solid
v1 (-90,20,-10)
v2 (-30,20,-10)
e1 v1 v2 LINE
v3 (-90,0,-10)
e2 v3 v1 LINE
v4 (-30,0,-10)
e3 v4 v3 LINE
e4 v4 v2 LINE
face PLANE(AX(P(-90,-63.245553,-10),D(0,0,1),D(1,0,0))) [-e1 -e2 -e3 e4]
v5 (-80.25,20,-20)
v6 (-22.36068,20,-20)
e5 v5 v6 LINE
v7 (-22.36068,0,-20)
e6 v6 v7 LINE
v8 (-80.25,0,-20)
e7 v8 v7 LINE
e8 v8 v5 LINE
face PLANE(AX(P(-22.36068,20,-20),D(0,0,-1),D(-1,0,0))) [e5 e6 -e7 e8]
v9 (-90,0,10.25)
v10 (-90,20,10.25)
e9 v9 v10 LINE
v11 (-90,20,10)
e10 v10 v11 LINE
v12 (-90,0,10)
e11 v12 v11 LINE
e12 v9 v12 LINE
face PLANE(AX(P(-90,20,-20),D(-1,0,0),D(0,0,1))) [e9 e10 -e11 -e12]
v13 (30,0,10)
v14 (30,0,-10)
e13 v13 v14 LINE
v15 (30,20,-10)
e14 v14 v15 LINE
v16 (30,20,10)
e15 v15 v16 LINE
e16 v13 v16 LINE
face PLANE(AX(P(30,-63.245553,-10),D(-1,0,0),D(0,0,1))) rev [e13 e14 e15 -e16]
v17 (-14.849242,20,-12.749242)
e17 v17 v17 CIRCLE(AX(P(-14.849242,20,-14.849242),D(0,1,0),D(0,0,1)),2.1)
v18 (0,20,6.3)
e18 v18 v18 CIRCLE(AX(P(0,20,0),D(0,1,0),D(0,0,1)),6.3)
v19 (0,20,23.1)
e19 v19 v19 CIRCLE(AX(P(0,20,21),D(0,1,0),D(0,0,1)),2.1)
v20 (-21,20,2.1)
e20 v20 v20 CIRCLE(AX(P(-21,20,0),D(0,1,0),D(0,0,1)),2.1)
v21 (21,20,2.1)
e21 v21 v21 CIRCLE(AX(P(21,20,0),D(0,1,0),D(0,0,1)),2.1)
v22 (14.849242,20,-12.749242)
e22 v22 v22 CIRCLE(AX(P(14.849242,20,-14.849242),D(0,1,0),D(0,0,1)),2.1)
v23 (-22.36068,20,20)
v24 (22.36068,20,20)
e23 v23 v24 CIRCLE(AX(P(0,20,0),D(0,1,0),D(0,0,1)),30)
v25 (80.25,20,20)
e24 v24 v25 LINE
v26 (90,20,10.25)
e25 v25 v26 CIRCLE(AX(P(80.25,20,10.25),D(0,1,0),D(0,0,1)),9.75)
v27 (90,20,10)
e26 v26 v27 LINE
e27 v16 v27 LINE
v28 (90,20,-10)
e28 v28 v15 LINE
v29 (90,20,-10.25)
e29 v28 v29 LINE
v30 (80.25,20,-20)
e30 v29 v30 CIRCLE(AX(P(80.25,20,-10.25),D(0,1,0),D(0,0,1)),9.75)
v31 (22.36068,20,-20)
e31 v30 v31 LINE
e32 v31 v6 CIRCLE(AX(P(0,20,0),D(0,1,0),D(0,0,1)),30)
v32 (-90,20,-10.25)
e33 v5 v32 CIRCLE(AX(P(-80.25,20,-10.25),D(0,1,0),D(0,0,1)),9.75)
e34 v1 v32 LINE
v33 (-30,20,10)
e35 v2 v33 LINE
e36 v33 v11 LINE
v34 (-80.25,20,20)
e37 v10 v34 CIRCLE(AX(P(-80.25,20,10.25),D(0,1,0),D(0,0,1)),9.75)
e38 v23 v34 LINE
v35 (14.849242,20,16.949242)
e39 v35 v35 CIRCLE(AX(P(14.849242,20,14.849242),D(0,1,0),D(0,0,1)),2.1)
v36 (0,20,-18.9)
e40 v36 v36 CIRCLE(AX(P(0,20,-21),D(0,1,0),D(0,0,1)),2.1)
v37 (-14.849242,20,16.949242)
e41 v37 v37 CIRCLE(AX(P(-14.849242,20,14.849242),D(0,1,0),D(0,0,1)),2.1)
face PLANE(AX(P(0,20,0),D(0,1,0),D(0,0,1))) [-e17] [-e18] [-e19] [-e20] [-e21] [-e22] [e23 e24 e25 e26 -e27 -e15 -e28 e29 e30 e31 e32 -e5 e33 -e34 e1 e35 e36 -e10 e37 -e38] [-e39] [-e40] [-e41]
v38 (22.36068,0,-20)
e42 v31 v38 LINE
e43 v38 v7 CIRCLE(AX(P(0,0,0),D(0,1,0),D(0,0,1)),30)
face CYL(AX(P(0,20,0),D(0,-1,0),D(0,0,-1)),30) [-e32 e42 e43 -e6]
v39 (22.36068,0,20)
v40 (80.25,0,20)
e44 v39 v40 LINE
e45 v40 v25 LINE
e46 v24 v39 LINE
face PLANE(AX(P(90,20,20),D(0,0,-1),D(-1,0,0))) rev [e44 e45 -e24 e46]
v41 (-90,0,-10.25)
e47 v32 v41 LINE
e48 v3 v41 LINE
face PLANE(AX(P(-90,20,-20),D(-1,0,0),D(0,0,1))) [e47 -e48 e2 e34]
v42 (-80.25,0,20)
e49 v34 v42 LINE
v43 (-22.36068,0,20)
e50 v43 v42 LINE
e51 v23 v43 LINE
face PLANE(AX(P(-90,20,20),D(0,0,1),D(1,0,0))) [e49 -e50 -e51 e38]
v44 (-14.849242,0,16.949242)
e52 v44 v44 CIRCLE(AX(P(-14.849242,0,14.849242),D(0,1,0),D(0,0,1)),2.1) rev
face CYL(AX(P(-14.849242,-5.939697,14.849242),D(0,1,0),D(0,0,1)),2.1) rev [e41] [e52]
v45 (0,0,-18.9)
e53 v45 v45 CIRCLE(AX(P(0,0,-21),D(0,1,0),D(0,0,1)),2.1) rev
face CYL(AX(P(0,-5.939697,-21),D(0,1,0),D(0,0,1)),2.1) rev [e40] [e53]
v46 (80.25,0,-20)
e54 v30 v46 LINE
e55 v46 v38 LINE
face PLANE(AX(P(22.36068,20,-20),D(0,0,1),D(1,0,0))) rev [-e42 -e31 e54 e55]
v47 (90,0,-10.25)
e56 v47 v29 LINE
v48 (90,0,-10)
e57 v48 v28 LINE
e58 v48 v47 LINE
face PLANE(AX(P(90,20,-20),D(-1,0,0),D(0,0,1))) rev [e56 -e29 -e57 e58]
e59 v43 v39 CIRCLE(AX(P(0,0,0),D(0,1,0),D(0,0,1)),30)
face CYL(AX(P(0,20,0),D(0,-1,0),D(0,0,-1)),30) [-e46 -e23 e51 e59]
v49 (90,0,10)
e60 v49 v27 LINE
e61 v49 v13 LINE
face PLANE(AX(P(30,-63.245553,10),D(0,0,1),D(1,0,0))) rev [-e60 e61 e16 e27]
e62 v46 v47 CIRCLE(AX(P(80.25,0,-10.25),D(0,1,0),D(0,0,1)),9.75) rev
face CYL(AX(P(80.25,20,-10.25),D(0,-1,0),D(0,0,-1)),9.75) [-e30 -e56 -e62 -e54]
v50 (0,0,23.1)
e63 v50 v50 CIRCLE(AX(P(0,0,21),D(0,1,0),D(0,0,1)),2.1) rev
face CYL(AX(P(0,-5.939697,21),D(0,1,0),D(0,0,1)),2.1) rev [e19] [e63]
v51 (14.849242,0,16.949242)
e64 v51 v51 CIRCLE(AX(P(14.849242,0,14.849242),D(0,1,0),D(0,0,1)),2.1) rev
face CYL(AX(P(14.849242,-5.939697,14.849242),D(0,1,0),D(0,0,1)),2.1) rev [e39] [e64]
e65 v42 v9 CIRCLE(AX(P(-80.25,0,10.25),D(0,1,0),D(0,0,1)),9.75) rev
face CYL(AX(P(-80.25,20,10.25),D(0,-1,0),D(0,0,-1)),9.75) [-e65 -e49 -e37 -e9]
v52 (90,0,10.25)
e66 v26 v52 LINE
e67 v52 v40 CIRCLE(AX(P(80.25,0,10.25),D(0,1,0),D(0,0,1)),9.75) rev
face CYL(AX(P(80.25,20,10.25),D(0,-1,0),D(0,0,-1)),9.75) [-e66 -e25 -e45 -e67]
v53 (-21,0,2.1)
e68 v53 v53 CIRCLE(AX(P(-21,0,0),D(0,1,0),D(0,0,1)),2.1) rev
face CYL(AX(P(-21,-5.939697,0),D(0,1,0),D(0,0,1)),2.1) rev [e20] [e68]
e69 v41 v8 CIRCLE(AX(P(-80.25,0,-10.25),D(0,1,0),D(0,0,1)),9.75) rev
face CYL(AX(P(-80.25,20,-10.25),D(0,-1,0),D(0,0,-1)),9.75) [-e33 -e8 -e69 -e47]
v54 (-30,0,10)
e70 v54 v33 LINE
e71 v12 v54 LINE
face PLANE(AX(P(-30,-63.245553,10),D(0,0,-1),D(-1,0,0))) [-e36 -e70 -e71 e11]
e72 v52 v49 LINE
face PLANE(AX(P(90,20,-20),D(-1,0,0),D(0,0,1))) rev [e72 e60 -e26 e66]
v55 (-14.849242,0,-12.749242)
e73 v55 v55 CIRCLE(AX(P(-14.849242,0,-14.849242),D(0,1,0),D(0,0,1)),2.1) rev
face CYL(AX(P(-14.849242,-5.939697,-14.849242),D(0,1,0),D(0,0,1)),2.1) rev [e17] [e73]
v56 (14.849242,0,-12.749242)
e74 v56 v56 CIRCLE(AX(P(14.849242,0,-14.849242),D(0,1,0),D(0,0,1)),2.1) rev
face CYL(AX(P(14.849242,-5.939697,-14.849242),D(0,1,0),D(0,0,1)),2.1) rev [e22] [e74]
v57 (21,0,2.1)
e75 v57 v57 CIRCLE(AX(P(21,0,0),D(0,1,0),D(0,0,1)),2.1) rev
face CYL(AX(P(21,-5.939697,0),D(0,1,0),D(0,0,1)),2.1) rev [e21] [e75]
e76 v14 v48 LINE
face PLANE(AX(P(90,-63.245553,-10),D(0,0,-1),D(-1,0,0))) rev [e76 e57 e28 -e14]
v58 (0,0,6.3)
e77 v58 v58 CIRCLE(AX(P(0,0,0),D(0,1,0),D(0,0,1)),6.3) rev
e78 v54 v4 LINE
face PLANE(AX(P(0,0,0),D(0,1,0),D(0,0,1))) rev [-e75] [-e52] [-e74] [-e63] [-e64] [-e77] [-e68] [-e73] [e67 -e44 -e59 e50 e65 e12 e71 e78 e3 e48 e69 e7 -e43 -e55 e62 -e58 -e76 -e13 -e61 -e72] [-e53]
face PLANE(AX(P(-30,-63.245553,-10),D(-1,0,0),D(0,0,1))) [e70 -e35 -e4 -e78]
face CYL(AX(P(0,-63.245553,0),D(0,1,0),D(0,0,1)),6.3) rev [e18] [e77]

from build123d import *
from build123d.topology import SkipClean

# Parameters (mm, degrees)
BOSS_EXTRUDE1_DEPTH  = 20
SKETCH2_W            = 60
SKETCH2_H            = 20
CUT_EXTRUDE1_DEPTH   = 20
FILLET1_R            = 9.75
FILLET1_OF_MIRROR4_R = 9.75
SKETCH4_R            = 2.1
CUT_EXTRUDE3_DEPTH   = 20


with BuildPart() as part:
    # Sketch1 → Boss-Extrude1 (new body)
    with BuildSketch(Plane(origin=(0, 0, 0), x_dir=(1, 0, 0), z_dir=(0, 1, 0))):
        with BuildLine():
            Line((22.360679775, 20), (90, 20))
            Line((90, 20), (90, -20))
            Line((90, -20), (22.360679775, -20))
            ThreePointArc((22.360679775, -20), (12.247448714, -27.386127875), (0, -30))
            Line((0, -30), (0, -20))
            Line((0, -20), (0, 20))
            Line((0, 20), (0, 30))
            ThreePointArc((0, 30), (12.247448714, 27.386127875), (22.360679775, 20))
        make_face()
    boss_extrude1 = extrude(amount=BOSS_EXTRUDE1_DEPTH)

    # Sketch2 → Cut-Extrude1 (cut)
    with BuildSketch(Plane(origin=(0, 20, 0), x_dir=(1, 0, 0), z_dir=(0, 1, 0))):
        with BuildLine():
            Line((0, 6.3), (0, -6.3))
            ThreePointArc((0, -6.3), (6.3, 0), (0, 6.3))
        make_face()
        with Locations((60, 0)):
            Rectangle(SKETCH2_W, SKETCH2_H)
    cut_extrude1 = extrude(amount=-CUT_EXTRUDE1_DEPTH, mode=Mode.SUBTRACT)

    # Fillet1
    fillet1_edges = [part.edges().sort_by_distance(p)[0] for p in [
        (90, 10, -20),
        (90, 10, 20),
    ]]
    fillet(fillet1_edges, radius=FILLET1_R)

    # Mirror4: Boss-Extrude1, Cut-Extrude1 across plane
    with SkipClean():  # the faces are left unmerged after this step: merging them gives an invalid solid
        add(boss_extrude1.mirror(Plane(origin=(0, 0, 0), x_dir=(0, 0, 1), z_dir=(1, 0, 0))))
        add(cut_extrude1.mirror(Plane(origin=(0, 0, 0), x_dir=(0, 0, 1), z_dir=(1, 0, 0))), mode=Mode.SUBTRACT)
    add(part.part.scale(1), mode=Mode.REPLACE)  # the faces are merged on a copy

    # Fillet1 of Mirror4
    fillet1_of_mirror4_edges = [part.edges().sort_by_distance(p)[0] for p in [
        (-90, 10, -20),
        (-90, 10, 20),
    ]]
    fillet(fillet1_of_mirror4_edges, radius=FILLET1_OF_MIRROR4_R)

    # Sketch4 → Cut-Extrude3 (cut)
    with BuildSketch(Plane(origin=(0, 20, 0), x_dir=(1, 0, 0), z_dir=(0, 1, 0))):
        with Locations(Location((21, 0, 0), (0, 0, 270))):
            Circle(SKETCH4_R)
        with Locations(Location((14.849242405, -14.849242405, 0), (0, 0, 270))):
            Circle(SKETCH4_R)
        with Locations(Location((0, -21, 0), (0, 0, 270))):
            Circle(SKETCH4_R)
        with Locations(Location((-14.849242405, -14.849242405, 0), (0, 0, 270))):
            Circle(SKETCH4_R)
        with Locations(Location((-21, 0, 0), (0, 0, 270))):
            Circle(SKETCH4_R)
        with Locations(Location((-14.849242405, 14.849242405, 0), (0, 0, 270))):
            Circle(SKETCH4_R)
        with Locations(Location((0, 21, 0), (0, 0, 270))):
            Circle(SKETCH4_R)
        with Locations(Location((14.849242405, 14.849242405, 0), (0, 0, 270))):
            Circle(SKETCH4_R)
    extrude(amount=-CUT_EXTRUDE3_DEPTH, mode=Mode.SUBTRACT)


solid = part.part
